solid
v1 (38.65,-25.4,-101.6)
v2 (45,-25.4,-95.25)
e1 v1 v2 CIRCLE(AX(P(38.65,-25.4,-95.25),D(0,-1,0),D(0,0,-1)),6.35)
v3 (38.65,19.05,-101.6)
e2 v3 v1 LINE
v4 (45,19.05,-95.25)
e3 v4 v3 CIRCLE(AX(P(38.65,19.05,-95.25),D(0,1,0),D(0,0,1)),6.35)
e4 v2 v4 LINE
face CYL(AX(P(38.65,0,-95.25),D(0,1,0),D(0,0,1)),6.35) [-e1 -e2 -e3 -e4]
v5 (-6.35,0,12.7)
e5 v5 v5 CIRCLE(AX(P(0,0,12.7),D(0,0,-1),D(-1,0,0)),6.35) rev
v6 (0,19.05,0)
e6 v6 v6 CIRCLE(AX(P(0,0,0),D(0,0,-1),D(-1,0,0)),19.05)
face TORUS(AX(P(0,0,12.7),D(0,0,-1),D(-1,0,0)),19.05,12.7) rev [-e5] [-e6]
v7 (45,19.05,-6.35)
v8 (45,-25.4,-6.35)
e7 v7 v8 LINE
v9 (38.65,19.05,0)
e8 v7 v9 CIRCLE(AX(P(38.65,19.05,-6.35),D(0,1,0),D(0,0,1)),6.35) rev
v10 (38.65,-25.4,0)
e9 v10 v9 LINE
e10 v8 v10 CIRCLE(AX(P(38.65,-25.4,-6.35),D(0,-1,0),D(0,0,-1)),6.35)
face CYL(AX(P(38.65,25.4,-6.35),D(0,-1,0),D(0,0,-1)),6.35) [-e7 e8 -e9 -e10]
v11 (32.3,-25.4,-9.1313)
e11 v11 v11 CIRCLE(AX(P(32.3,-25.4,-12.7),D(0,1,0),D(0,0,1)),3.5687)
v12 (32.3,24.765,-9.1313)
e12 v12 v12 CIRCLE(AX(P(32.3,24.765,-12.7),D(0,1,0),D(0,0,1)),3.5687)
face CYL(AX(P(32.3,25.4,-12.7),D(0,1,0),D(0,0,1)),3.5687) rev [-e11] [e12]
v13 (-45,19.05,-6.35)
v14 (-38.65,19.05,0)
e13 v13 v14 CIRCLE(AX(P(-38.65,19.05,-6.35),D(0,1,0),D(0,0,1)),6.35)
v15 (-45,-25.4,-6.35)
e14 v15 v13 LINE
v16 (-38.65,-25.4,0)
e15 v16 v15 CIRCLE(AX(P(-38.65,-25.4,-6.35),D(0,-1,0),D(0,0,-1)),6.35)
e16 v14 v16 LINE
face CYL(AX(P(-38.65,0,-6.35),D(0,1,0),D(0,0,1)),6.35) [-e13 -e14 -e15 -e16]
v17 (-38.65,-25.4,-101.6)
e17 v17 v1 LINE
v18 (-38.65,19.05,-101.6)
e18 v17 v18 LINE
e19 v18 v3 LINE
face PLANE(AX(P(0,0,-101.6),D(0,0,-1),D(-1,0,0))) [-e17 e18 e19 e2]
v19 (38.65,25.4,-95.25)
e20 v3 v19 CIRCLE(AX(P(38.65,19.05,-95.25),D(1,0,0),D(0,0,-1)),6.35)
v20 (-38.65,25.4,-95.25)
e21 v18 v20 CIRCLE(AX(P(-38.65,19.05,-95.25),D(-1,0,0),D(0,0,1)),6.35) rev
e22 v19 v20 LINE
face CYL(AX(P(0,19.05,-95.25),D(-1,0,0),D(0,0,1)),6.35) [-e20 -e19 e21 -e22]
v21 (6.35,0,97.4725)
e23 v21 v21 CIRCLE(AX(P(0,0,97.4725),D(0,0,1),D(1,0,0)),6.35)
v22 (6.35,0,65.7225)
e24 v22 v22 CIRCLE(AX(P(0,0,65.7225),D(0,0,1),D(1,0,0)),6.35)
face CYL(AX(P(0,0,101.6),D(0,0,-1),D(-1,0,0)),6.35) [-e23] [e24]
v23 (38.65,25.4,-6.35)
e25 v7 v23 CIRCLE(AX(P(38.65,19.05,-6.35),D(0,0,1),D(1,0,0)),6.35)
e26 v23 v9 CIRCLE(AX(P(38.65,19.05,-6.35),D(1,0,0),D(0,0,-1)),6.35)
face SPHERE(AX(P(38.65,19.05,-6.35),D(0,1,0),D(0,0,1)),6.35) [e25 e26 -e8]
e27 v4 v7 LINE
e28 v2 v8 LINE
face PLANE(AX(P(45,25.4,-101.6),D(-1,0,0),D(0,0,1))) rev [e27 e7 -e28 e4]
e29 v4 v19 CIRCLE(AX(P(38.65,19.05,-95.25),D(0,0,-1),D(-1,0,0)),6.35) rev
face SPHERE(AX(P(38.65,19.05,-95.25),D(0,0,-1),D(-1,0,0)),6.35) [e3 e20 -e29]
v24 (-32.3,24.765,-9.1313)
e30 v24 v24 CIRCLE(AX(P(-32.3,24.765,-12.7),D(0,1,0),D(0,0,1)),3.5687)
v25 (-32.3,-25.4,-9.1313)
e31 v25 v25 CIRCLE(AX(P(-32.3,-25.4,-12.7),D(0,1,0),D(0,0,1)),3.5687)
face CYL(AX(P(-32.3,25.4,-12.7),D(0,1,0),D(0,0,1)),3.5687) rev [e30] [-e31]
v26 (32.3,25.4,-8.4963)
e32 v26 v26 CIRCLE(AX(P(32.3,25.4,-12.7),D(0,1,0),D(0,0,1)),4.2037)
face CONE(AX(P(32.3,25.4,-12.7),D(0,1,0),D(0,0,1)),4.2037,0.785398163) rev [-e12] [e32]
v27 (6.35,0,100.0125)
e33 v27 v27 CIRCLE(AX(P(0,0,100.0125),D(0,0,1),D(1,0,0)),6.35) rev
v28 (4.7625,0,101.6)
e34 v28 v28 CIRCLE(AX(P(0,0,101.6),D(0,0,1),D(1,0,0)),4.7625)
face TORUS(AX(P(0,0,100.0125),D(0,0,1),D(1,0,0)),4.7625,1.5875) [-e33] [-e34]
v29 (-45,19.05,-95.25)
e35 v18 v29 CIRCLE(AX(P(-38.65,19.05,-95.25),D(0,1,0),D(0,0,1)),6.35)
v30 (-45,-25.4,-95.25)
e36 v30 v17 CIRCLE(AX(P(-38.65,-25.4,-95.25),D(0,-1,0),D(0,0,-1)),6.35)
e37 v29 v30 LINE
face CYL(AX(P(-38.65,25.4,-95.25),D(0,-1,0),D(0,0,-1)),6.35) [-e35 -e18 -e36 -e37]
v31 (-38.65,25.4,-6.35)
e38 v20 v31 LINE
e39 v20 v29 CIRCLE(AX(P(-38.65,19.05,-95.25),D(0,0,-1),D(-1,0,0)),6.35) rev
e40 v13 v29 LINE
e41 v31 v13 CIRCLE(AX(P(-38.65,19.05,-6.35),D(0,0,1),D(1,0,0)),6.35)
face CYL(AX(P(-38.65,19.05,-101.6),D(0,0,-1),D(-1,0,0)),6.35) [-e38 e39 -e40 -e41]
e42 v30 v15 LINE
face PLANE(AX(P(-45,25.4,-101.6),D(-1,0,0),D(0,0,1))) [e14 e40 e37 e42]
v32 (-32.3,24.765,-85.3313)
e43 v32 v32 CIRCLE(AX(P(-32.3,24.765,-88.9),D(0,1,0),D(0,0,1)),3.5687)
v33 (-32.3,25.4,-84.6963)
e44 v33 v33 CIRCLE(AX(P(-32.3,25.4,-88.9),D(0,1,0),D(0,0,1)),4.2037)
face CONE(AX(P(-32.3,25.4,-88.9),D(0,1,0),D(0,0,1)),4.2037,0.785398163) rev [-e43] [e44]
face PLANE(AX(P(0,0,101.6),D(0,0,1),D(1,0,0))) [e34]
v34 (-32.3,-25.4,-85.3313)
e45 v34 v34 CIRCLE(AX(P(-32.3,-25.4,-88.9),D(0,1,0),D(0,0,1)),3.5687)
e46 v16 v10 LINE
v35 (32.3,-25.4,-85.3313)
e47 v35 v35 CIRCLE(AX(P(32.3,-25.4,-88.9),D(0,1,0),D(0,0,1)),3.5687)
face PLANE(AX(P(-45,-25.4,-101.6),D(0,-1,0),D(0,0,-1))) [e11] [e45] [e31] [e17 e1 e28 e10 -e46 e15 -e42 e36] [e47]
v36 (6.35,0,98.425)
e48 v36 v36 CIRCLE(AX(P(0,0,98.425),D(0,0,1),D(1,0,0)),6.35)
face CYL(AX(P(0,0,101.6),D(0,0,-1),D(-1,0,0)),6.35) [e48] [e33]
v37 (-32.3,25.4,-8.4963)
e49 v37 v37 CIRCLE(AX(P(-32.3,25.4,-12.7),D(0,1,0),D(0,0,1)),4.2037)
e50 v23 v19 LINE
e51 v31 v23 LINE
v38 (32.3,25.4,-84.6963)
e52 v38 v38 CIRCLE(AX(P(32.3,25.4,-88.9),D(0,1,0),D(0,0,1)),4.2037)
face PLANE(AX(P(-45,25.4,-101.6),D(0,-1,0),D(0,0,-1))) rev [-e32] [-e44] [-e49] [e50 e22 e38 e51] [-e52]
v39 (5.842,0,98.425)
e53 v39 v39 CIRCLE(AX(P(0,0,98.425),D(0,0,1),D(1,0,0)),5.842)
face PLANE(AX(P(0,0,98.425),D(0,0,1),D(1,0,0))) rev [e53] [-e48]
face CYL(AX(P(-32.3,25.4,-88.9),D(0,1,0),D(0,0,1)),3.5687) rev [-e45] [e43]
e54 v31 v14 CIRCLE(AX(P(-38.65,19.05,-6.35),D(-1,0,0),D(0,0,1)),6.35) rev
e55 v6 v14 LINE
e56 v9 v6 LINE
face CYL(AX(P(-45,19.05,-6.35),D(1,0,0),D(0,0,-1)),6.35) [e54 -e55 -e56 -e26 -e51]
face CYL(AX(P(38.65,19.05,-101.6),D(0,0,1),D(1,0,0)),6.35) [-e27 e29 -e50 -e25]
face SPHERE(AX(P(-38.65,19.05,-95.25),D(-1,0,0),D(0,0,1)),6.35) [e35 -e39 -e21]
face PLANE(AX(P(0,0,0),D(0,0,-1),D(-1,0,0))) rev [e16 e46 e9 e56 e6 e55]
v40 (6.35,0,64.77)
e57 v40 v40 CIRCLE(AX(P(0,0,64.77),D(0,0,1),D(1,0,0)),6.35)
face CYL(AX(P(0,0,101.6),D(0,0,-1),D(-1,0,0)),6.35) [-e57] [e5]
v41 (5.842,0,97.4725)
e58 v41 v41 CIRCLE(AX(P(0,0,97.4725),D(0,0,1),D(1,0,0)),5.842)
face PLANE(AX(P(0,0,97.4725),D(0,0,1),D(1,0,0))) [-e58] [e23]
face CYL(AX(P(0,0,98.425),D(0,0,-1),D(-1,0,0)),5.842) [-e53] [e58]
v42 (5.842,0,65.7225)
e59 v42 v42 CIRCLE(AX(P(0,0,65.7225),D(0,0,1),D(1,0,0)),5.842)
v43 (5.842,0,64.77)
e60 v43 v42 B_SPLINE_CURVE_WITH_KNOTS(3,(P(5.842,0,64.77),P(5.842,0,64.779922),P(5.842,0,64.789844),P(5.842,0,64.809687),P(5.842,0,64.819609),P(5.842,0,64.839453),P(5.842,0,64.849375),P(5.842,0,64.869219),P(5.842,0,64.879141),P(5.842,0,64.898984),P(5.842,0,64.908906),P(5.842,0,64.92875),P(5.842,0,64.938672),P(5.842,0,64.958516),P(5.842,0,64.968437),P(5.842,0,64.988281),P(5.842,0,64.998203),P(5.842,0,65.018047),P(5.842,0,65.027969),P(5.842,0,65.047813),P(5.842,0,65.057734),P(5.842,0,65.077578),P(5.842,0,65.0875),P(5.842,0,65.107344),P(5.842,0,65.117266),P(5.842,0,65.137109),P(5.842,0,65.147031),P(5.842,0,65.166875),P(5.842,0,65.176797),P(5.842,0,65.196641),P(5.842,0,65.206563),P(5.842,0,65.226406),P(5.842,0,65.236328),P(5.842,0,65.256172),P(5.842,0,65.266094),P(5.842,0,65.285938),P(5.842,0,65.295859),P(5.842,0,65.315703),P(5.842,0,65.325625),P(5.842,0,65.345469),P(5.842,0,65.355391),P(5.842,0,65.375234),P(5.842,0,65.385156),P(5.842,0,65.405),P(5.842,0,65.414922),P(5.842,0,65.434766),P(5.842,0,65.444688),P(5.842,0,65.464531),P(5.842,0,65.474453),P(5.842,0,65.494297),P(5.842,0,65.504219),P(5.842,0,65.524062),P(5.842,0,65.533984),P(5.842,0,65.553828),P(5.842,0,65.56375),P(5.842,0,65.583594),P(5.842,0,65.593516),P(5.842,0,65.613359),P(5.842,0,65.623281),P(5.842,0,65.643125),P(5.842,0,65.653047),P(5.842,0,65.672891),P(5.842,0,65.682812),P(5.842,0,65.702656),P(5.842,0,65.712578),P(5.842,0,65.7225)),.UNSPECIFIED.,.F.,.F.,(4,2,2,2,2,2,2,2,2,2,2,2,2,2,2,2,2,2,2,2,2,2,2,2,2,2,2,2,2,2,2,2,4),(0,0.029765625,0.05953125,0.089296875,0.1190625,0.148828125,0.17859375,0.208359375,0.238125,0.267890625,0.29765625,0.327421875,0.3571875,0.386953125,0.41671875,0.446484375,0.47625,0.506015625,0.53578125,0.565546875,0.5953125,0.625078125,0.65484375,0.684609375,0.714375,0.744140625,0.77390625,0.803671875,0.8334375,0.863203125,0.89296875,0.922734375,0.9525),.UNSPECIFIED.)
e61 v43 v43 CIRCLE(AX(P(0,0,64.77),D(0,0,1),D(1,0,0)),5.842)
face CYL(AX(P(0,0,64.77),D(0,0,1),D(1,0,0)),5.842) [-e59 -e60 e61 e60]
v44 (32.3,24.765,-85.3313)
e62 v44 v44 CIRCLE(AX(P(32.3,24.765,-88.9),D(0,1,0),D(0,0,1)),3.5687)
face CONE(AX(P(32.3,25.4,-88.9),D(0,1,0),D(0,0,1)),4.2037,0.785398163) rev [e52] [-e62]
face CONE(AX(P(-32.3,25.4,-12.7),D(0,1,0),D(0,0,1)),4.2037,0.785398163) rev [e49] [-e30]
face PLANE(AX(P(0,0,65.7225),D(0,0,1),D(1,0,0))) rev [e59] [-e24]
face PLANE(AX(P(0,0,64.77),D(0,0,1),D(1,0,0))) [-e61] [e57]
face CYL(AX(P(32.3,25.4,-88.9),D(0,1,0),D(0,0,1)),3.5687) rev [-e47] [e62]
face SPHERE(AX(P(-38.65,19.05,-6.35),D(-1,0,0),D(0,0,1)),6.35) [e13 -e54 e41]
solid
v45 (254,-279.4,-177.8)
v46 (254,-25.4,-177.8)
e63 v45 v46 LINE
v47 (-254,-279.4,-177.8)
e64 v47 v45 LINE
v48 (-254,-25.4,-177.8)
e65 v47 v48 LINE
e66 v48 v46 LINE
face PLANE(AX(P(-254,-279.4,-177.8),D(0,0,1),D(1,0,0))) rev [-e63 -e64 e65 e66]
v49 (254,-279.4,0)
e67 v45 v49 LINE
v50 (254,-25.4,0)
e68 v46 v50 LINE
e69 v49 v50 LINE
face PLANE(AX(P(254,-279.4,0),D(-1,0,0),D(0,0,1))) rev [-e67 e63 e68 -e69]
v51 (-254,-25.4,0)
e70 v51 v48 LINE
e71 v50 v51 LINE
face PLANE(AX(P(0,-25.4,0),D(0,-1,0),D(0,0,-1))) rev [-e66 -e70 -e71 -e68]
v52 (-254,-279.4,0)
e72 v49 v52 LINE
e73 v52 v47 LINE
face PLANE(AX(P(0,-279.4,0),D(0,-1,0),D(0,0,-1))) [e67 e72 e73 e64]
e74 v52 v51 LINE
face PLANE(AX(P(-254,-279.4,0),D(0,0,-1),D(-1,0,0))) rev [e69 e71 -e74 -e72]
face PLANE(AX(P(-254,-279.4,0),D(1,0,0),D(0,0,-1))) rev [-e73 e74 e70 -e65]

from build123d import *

# Parameters (mm, degrees)
SKETCH1_W                         = 90
SKETCH1_H                         = 50.8
BOSS_EXTRUDE1_DEPTH               = 101.6
SKETCH1_3_R                       = 6.35
BOSS_EXTRUDE2_DEPTH               = 101.6
FILLET1_R                         = 6.35
FILLET2_R                         = 12.7
F_1_4_CLEARANCE_HOLE1_D           = 7.1374
F_1_4_CLEARANCE_HOLE1_CSINK_D     = 8.4074
F_1_4_CLEARANCE_HOLE1_CSINK_ANGLE = 90
SKETCH7_R                         = 6.35
SKETCH7_R_2                       = 5.842
CUT_EXTRUDE1_DEPTH                = 0.9525
CUT_EXTRUDE2_START                = -0.9525
SKETCH8_R                         = 6.35
SKETCH8_R_2                       = 5.842
CUT_EXTRUDE2_DEPTH                = 0.9525
FILLET3_R                         = 1.5875
SKETCH11_W                        = 508
SKETCH11_H                        = 177.8
BOSS_EXTRUDE3_DEPTH               = 254


with BuildPart() as part:
    # Sketch1 → Boss-Extrude1 (new body)
    with BuildSketch(Plane.XY):
        Rectangle(SKETCH1_W, SKETCH1_H)
    extrude(amount=-BOSS_EXTRUDE1_DEPTH)

    # Sketch1<3> → Boss-Extrude2 (add)
    with BuildSketch(Plane.XY):
        Circle(SKETCH1_3_R)
    extrude(amount=BOSS_EXTRUDE2_DEPTH)

    # Fillet1
    fillet1_edges = [part.edges().sort_by_distance(p)[0] for p in [
        (-45, 0, -101.6),
        (0, 25.4, -101.6),
        (-45, 0, 0),
        (45, 0, 0),
        (0, 25.4, 0),
        (-45, 25.4, -50.8),
        (45, 25.4, -50.8),
        (45, 0, -101.6),
    ]]
    fillet(fillet1_edges, radius=FILLET1_R)

    # Fillet2
    fillet2_edges = [part.edges().sort_by_distance(p)[0] for p in [
        (-6.35, 0, 0),
    ]]
    fillet(fillet2_edges, radius=FILLET2_R - 0.0001)  # a hair under: the kernel refuses the full size

    # 1/4 Clearance Hole1 (through all)
    with Locations(Plane(origin=(0, 25.4, 0), x_dir=(1, 0, 0), z_dir=(0, 1, 0))):
        with Locations((-32.3, 88.9), (-32.3, 12.7), (32.3, 12.7), (32.3, 88.9)):
            CounterSinkHole(F_1_4_CLEARANCE_HOLE1_D / 2, F_1_4_CLEARANCE_HOLE1_CSINK_D / 2, counter_sink_angle=F_1_4_CLEARANCE_HOLE1_CSINK_ANGLE)

    # Sketch7 → Cut-Extrude1 (cut)
    with BuildSketch(Plane.XY.offset(97.4725)):
        with Locations(Location((0, 0, 0), (0, 0, 180))):
            Circle(SKETCH7_R)
        Circle(SKETCH7_R_2, mode=Mode.SUBTRACT)
    extrude(amount=CUT_EXTRUDE1_DEPTH, mode=Mode.SUBTRACT)

    # Sketch8 → Cut-Extrude2 (cut)
    with BuildSketch(Plane.XY.offset(65.7225).offset(CUT_EXTRUDE2_START)):
        with Locations(Location((0, 0, 0), (0, 0, 180))):
            Circle(SKETCH8_R)
        Circle(SKETCH8_R_2, mode=Mode.SUBTRACT)
    extrude(amount=CUT_EXTRUDE2_DEPTH, mode=Mode.SUBTRACT)

    # Fillet3
    fillet3_edges = [part.edges().sort_by_distance(p)[0] for p in [
        (-6.35, 0, 101.6),
    ]]
    fillet(fillet3_edges, radius=FILLET3_R)


with BuildPart() as body_2:
    # Sketch11 → Boss-Extrude3 (new body)
    with BuildSketch(Plane.XZ.offset(25.4)):
        with Locations((0, -88.9)):
            Rectangle(SKETCH11_W, SKETCH11_H)
    extrude(amount=BOSS_EXTRUDE3_DEPTH)


solid = Compound([part.part, body_2.part])
